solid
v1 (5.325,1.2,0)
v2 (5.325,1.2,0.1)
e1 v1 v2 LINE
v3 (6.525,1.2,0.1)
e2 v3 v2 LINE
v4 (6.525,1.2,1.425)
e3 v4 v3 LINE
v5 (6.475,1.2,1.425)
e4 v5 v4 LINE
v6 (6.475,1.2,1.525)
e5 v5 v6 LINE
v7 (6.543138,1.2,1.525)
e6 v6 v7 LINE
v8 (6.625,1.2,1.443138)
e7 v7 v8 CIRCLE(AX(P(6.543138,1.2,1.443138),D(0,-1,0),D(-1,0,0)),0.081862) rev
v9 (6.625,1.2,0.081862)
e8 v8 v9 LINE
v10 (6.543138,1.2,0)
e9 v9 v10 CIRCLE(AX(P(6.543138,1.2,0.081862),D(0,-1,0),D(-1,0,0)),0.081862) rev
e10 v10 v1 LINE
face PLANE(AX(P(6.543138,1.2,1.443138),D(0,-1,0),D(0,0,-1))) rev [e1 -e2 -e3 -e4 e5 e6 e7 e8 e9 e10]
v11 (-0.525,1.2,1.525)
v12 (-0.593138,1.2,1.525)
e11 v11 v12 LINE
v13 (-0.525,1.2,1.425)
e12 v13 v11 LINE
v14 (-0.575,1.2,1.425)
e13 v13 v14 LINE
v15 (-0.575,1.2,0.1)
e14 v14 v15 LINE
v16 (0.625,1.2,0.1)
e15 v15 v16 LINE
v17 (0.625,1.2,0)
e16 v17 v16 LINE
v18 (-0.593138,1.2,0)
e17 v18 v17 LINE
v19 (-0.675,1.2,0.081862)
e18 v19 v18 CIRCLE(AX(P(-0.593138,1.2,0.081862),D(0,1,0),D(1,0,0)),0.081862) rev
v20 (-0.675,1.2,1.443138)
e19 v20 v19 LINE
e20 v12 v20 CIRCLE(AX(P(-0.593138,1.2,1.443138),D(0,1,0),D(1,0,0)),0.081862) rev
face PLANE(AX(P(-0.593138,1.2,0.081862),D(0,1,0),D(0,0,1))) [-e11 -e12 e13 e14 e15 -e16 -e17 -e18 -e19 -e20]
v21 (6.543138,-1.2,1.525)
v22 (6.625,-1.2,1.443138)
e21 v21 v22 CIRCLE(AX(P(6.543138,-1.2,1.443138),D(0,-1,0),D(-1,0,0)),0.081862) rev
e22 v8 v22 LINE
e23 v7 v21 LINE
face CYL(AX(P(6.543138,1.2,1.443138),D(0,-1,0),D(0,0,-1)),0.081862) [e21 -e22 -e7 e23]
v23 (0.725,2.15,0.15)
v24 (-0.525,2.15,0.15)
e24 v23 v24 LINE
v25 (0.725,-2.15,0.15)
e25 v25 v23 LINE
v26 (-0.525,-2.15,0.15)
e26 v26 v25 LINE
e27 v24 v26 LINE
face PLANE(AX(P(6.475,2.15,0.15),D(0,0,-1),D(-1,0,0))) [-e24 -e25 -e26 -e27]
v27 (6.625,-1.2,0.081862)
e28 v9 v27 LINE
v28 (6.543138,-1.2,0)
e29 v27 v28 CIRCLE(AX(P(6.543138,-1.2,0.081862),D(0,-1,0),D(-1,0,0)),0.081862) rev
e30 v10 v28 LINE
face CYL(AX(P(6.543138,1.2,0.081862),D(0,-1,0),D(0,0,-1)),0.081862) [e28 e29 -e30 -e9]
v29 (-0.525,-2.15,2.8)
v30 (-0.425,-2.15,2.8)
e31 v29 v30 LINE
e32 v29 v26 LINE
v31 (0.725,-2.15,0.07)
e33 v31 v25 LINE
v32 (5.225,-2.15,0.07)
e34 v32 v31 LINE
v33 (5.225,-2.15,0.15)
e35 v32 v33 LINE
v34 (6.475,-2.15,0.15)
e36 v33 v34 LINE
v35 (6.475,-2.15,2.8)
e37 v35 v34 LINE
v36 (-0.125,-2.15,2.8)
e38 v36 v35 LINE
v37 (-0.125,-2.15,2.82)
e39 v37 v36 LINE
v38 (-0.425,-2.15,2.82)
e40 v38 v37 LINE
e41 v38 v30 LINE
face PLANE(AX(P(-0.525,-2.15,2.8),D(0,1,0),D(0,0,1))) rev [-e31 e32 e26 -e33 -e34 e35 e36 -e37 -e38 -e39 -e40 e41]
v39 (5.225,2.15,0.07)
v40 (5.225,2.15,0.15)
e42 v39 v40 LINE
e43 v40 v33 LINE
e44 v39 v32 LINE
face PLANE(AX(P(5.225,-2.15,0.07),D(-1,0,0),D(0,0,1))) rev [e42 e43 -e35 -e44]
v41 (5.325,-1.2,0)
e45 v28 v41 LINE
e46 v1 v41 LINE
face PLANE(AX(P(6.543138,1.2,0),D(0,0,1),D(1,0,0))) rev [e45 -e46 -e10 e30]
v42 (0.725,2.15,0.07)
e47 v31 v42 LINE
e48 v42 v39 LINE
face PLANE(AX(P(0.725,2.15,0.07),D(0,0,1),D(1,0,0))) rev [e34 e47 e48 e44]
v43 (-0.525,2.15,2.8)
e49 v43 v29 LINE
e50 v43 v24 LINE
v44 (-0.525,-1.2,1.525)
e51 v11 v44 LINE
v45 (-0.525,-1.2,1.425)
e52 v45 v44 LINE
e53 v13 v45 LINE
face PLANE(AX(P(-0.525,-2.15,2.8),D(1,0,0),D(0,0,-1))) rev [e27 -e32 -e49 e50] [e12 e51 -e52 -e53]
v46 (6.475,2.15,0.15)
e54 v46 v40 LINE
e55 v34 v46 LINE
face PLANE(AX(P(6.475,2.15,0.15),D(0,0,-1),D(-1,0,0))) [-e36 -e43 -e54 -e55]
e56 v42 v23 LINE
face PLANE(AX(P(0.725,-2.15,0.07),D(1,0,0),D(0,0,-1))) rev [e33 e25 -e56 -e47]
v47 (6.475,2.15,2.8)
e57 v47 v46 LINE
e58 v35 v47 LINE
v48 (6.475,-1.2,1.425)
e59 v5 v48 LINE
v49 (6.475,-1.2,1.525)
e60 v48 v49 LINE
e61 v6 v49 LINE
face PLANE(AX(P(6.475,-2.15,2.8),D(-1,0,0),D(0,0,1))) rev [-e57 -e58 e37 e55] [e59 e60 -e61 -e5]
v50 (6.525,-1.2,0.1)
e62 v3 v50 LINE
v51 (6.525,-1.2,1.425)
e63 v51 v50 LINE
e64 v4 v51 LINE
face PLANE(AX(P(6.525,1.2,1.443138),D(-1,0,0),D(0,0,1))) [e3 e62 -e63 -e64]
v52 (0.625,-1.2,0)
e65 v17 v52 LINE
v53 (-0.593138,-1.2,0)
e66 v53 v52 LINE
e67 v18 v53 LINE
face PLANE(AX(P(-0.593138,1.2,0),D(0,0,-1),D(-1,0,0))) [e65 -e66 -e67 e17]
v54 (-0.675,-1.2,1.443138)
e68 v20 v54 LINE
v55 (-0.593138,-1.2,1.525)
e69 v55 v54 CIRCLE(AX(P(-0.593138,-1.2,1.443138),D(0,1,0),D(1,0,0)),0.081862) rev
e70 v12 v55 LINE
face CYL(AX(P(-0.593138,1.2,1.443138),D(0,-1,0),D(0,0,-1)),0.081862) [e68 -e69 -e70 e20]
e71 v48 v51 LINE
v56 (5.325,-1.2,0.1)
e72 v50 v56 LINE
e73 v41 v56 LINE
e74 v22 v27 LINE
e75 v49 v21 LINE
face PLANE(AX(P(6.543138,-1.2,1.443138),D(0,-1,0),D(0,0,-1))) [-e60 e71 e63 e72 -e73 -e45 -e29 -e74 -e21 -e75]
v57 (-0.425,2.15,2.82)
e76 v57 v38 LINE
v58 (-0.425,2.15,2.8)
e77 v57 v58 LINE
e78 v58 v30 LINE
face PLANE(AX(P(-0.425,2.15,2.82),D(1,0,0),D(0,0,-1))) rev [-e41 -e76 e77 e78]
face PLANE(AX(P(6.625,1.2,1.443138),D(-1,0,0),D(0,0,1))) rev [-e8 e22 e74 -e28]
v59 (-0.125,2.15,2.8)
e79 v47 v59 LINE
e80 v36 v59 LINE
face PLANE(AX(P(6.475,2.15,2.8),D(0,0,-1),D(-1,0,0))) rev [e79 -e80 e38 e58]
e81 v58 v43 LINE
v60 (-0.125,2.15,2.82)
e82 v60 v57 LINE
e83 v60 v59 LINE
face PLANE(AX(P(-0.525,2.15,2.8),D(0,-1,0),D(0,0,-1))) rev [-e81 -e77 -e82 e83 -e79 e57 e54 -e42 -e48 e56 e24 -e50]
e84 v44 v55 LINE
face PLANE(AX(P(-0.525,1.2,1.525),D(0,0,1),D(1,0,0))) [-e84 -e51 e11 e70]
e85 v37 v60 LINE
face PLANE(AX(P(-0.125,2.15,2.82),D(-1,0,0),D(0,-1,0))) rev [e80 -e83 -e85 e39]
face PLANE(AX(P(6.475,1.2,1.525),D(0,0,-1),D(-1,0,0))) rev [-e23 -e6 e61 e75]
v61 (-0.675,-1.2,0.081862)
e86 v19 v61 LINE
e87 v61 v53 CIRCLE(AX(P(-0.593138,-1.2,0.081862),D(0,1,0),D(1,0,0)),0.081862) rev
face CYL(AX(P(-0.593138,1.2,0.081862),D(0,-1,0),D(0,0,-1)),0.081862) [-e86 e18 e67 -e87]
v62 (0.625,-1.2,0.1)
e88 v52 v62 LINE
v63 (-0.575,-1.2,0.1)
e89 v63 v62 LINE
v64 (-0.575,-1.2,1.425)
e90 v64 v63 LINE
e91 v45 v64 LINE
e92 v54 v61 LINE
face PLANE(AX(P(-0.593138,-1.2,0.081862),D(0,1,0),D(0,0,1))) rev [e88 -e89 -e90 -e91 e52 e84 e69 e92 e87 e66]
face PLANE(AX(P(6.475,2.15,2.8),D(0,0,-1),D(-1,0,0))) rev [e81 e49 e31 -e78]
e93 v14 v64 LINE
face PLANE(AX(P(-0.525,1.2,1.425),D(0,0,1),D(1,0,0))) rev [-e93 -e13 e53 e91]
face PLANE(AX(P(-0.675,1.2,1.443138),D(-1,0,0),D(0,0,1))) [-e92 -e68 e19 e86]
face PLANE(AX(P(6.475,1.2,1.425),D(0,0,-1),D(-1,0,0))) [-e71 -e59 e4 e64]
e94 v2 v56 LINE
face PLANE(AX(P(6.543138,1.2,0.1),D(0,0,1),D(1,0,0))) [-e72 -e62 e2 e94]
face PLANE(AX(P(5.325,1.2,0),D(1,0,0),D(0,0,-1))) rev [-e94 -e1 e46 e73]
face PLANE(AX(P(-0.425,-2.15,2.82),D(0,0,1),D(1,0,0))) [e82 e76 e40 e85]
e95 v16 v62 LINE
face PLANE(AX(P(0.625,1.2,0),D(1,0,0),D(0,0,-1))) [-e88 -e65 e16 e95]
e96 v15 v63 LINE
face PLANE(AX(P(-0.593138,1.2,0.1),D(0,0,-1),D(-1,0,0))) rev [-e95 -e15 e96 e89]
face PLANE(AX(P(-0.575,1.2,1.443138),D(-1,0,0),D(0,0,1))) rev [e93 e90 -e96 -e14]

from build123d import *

# Parameters (mm, degrees)
SKETCH_1_W          = 7
SKETCH_1_H          = 4.3
EXTRUDE_1_DEPTH     = 2.65
EXTRUDE_2_DEPTH     = 1.2
SKETCH_3_W          = 4.5
SKETCH_3_H          = 4.3
EXTRUDE_2_2_DEPTH   = 0.08
SKETCH_4_W          = 0.3
SKETCH_4_H          = 4.3
EXTRUDE_3_DEPTH     = 0.02
MOVE_START          = -2.15
MOVE_BODY_1_DEPTH   = 4.3
MOVE_BODY_1_2_DEPTH = 0.95
MOVE_START_2        = 1.2
MOVE_BODY_1_3_DEPTH = 0.95
MOVE_BODY_1_4_DEPTH = 4.3
MOVE_START_3        = -1.2
MOVE_BODY_1_5_DEPTH = 2.4


# Read off the part's stored shape, not the designer's step: Тело-Переместить/Копировать1
with BuildPart() as part:
    # Эскиз1 → Бобышка-Вытянуть1 (new body)
    with BuildSketch(Plane.XY):
        Rectangle(SKETCH_1_W, SKETCH_1_H)
    extrude(amount=EXTRUDE_1_DEPTH)

    # Эскиз2 → Extrude 2 (add, symmetric)
    with BuildSketch(Plane(origin=(0, 0, 0), x_dir=(1, 0, 0), z_dir=(0, 1, 0))):
        with BuildLine():
            Line((-3.5, -1.275), (-3.55, -1.275))
            Line((-3.55, -1.275), (-3.55, 0.05))
            Line((-3.55, 0.05), (-2.35, 0.05))
            Line((-2.35, 0.05), (-2.35, 0.15))
            Line((-2.35, 0.15), (-3.568137941, 0.15))
            ThreePointArc((-3.568137941, 0.15), (-3.626023158, 0.126023158), (-3.65, 0.068137941))
            Line((-3.65, 0.068137941), (-3.65, -1.293137941))
            ThreePointArc((-3.65, -1.293137941), (-3.626023158, -1.351023158), (-3.568137941, -1.375))
            Line((-3.568137941, -1.375), (-3.5, -1.375))
            Line((-3.5, -1.375), (-3.5, -1.275))
        make_face()
    extrude_2 = extrude(amount=EXTRUDE_2_DEPTH, both=True)

    # Эскиз3 → Extrude 2 2 (add)
    with BuildSketch(Plane(origin=(0, 0, 0), x_dir=(-1, 0, 0), z_dir=(0, 0, -1))):
        Rectangle(SKETCH_3_W, SKETCH_3_H)
    extrude(amount=EXTRUDE_2_2_DEPTH)

    # Зеркальное отражение1: Extrude 2 across plane
    add(extrude_2.mirror(Plane(origin=(0, 0, 0), x_dir=(0, 0, 1), z_dir=(1, 0, 0))))

    # Эскиз4 → Бобышка-Вытянуть3 (add)
    with BuildSketch(Plane.XY.offset(2.65)):
        with Locations((-3.25, 0)):
            Rectangle(SKETCH_4_W, SKETCH_4_H)
    extrude(amount=EXTRUDE_3_DEPTH)

    # Move Body 1 outline → Move Body 1 (cut)
    with BuildSketch(Plane(origin=(0, 0, 0), x_dir=(1, 0, 0), z_dir=(0, 1, 0)).offset(MOVE_START)):
        with BuildLine():
            Line((-3.1, -2.65), (-0.525, -2.65))
            Line((-0.525, -2.65), (-0.525, -1.525))
            Line((-0.525, -1.525), (-0.593137941, -1.525))
            ThreePointArc((-0.593137941, -1.525), (-0.651023158, -1.501023158), (-0.675, -1.443137941))
            Line((-0.675, -1.443137941), (-0.675, -0.081862059))
            ThreePointArc((-0.675, -0.081862059), (-0.651023158, -0.023976842), (-0.593137941, 0))
            Line((-0.593137941, 0), (0.625, 0))
            Line((0.625, 0), (0.625, -0.1))
            Line((0.625, -0.1), (-0.575, -0.1))
            Line((-0.575, -0.1), (-0.575, -1.425))
            Line((-0.575, -1.425), (-0.525, -1.425))
            Line((-0.525, -1.425), (-0.525, -0.15))
            Line((-0.525, -0.15), (0.725, -0.15))
            Line((0.725, -0.15), (0.725, -0.07))
            Line((0.725, -0.07), (3.5, -0.07))
            Line((3.5, -0.07), (3.5, 0))
            Line((3.5, 0), (2.25, 0))
            Line((2.25, 0), (2.25, 0.08))
            Line((2.25, 0.08), (-2.25, 0.08))
            Line((-2.25, 0.08), (-2.25, 0))
            Line((-2.25, 0), (-3.5, 0))
            Line((-3.5, 0), (-3.5, -1.275))
            Line((-3.5, -1.275), (-3.55, -1.275))
            Line((-3.55, -1.275), (-3.55, 0.05))
            Line((-3.55, 0.05), (-2.35, 0.05))
            Line((-2.35, 0.05), (-2.35, 0.15))
            Line((-2.35, 0.15), (-3.568137941, 0.15))
            ThreePointArc((-3.568137941, 0.15), (-3.626023158, 0.126023158), (-3.65, 0.068137941))
            Line((-3.65, 0.068137941), (-3.65, -1.293137941))
            ThreePointArc((-3.65, -1.293137941), (-3.626023158, -1.351023158), (-3.568137941, -1.375))
            Line((-3.568137941, -1.375), (-3.5, -1.375))
            Line((-3.5, -1.375), (-3.5, -2.65))
            Line((-3.5, -2.65), (-3.4, -2.65))
            Line((-3.4, -2.65), (-3.4, -2.67))
            Line((-3.4, -2.67), (-3.1, -2.67))
            Line((-3.1, -2.67), (-3.1, -2.65))
        make_face()
        with BuildLine():
            Line((3.55, 0.05), (3.55, -0.07))
            Line((3.55, -0.07), (3.65, -0.07))
            Line((3.65, -0.07), (3.65, 0.068137941))
            ThreePointArc((3.65, 0.068137941), (3.626023158, 0.126023158), (3.568137941, 0.15))
            Line((3.568137941, 0.15), (2.35, 0.15))
            Line((2.35, 0.15), (2.35, 0.05))
            Line((2.35, 0.05), (3.55, 0.05))
        make_face()
    extrude(amount=MOVE_BODY_1_DEPTH, mode=Mode.SUBTRACT)

    # Move Body 1 2 outline → Move Body 1 2 (cut)
    with BuildSketch(Plane(origin=(0, 0, 0), x_dir=(1, 0, 0), z_dir=(0, 1, 0)).offset(MOVE_START)):
        with BuildLine():
            Line((-0.593137941, -1.525), (-0.525, -1.525))
            Line((-0.525, -1.525), (-0.525, -1.425))
            Line((-0.525, -1.425), (-0.575, -1.425))
            Line((-0.575, -1.425), (-0.575, -0.1))
            Line((-0.575, -0.1), (0.625, -0.1))
            Line((0.625, -0.1), (0.625, 0))
            Line((0.625, 0), (-0.593137941, 0))
            ThreePointArc((-0.593137941, 0), (-0.651023158, -0.023976842), (-0.675, -0.081862059))
            Line((-0.675, -0.081862059), (-0.675, -1.443137941))
            ThreePointArc((-0.675, -1.443137941), (-0.651023158, -1.501023158), (-0.593137941, -1.525))
        make_face()
    extrude(amount=MOVE_BODY_1_2_DEPTH, mode=Mode.SUBTRACT)

    # Move Body 1 3 outline → Move Body 1 3 (cut)
    with BuildSketch(Plane(origin=(0, 0, 0), x_dir=(1, 0, 0), z_dir=(0, 1, 0)).offset(MOVE_START_2)):
        with BuildLine():
            Line((-0.593137941, -1.525), (-0.525, -1.525))
            Line((-0.525, -1.525), (-0.525, -1.425))
            Line((-0.525, -1.425), (-0.575, -1.425))
            Line((-0.575, -1.425), (-0.575, -0.1))
            Line((-0.575, -0.1), (0.625, -0.1))
            Line((0.625, -0.1), (0.625, 0))
            Line((0.625, 0), (-0.593137941, 0))
            ThreePointArc((-0.593137941, 0), (-0.651023158, -0.023976842), (-0.675, -0.081862059))
            Line((-0.675, -0.081862059), (-0.675, -1.443137941))
            ThreePointArc((-0.675, -1.443137941), (-0.651023158, -1.501023158), (-0.593137941, -1.525))
        make_face()
    extrude(amount=MOVE_BODY_1_3_DEPTH, mode=Mode.SUBTRACT)

    # Move Body 1 4 outline → Move Body 1 4 (add)
    with BuildSketch(Plane(origin=(0, 0, 0), x_dir=(1, 0, 0), z_dir=(0, 1, 0)).offset(MOVE_START)):
        Polygon((-0.525, -2.8), (-0.425, -2.8), (-0.425, -2.82), (-0.125, -2.82), (-0.125, -2.8), (6.475, -2.8), (6.475, -0.15), (5.225, -0.15), (5.225, -0.07), (3.5, -0.07), (3.5, -2.65), (-0.525, -2.65), align=None)
    extrude(amount=MOVE_BODY_1_4_DEPTH)

    # Move Body 1 5 outline → Move Body 1 5 (add)
    with BuildSketch(Plane(origin=(0, 0, 0), x_dir=(1, 0, 0), z_dir=(0, 1, 0)).offset(MOVE_START_3)):
        with BuildLine():
            Line((6.475, -1.425), (6.475, -1.525))
            Line((6.475, -1.525), (6.543137941, -1.525))
            ThreePointArc((6.543137941, -1.525), (6.601023158, -1.501023158), (6.625, -1.443137941))
            Line((6.625, -1.443137941), (6.625, -0.081862059))
            ThreePointArc((6.625, -0.081862059), (6.601023158, -0.023976842), (6.543137941, 0))
            Line((6.543137941, 0), (5.325, 0))
            Line((5.325, 0), (5.325, -0.1))
            Line((5.325, -0.1), (6.525, -0.1))
            Line((6.525, -0.1), (6.525, -1.425))
            Line((6.525, -1.425), (6.475, -1.425))
        make_face()
    extrude(amount=MOVE_BODY_1_5_DEPTH)


solid = part.part
